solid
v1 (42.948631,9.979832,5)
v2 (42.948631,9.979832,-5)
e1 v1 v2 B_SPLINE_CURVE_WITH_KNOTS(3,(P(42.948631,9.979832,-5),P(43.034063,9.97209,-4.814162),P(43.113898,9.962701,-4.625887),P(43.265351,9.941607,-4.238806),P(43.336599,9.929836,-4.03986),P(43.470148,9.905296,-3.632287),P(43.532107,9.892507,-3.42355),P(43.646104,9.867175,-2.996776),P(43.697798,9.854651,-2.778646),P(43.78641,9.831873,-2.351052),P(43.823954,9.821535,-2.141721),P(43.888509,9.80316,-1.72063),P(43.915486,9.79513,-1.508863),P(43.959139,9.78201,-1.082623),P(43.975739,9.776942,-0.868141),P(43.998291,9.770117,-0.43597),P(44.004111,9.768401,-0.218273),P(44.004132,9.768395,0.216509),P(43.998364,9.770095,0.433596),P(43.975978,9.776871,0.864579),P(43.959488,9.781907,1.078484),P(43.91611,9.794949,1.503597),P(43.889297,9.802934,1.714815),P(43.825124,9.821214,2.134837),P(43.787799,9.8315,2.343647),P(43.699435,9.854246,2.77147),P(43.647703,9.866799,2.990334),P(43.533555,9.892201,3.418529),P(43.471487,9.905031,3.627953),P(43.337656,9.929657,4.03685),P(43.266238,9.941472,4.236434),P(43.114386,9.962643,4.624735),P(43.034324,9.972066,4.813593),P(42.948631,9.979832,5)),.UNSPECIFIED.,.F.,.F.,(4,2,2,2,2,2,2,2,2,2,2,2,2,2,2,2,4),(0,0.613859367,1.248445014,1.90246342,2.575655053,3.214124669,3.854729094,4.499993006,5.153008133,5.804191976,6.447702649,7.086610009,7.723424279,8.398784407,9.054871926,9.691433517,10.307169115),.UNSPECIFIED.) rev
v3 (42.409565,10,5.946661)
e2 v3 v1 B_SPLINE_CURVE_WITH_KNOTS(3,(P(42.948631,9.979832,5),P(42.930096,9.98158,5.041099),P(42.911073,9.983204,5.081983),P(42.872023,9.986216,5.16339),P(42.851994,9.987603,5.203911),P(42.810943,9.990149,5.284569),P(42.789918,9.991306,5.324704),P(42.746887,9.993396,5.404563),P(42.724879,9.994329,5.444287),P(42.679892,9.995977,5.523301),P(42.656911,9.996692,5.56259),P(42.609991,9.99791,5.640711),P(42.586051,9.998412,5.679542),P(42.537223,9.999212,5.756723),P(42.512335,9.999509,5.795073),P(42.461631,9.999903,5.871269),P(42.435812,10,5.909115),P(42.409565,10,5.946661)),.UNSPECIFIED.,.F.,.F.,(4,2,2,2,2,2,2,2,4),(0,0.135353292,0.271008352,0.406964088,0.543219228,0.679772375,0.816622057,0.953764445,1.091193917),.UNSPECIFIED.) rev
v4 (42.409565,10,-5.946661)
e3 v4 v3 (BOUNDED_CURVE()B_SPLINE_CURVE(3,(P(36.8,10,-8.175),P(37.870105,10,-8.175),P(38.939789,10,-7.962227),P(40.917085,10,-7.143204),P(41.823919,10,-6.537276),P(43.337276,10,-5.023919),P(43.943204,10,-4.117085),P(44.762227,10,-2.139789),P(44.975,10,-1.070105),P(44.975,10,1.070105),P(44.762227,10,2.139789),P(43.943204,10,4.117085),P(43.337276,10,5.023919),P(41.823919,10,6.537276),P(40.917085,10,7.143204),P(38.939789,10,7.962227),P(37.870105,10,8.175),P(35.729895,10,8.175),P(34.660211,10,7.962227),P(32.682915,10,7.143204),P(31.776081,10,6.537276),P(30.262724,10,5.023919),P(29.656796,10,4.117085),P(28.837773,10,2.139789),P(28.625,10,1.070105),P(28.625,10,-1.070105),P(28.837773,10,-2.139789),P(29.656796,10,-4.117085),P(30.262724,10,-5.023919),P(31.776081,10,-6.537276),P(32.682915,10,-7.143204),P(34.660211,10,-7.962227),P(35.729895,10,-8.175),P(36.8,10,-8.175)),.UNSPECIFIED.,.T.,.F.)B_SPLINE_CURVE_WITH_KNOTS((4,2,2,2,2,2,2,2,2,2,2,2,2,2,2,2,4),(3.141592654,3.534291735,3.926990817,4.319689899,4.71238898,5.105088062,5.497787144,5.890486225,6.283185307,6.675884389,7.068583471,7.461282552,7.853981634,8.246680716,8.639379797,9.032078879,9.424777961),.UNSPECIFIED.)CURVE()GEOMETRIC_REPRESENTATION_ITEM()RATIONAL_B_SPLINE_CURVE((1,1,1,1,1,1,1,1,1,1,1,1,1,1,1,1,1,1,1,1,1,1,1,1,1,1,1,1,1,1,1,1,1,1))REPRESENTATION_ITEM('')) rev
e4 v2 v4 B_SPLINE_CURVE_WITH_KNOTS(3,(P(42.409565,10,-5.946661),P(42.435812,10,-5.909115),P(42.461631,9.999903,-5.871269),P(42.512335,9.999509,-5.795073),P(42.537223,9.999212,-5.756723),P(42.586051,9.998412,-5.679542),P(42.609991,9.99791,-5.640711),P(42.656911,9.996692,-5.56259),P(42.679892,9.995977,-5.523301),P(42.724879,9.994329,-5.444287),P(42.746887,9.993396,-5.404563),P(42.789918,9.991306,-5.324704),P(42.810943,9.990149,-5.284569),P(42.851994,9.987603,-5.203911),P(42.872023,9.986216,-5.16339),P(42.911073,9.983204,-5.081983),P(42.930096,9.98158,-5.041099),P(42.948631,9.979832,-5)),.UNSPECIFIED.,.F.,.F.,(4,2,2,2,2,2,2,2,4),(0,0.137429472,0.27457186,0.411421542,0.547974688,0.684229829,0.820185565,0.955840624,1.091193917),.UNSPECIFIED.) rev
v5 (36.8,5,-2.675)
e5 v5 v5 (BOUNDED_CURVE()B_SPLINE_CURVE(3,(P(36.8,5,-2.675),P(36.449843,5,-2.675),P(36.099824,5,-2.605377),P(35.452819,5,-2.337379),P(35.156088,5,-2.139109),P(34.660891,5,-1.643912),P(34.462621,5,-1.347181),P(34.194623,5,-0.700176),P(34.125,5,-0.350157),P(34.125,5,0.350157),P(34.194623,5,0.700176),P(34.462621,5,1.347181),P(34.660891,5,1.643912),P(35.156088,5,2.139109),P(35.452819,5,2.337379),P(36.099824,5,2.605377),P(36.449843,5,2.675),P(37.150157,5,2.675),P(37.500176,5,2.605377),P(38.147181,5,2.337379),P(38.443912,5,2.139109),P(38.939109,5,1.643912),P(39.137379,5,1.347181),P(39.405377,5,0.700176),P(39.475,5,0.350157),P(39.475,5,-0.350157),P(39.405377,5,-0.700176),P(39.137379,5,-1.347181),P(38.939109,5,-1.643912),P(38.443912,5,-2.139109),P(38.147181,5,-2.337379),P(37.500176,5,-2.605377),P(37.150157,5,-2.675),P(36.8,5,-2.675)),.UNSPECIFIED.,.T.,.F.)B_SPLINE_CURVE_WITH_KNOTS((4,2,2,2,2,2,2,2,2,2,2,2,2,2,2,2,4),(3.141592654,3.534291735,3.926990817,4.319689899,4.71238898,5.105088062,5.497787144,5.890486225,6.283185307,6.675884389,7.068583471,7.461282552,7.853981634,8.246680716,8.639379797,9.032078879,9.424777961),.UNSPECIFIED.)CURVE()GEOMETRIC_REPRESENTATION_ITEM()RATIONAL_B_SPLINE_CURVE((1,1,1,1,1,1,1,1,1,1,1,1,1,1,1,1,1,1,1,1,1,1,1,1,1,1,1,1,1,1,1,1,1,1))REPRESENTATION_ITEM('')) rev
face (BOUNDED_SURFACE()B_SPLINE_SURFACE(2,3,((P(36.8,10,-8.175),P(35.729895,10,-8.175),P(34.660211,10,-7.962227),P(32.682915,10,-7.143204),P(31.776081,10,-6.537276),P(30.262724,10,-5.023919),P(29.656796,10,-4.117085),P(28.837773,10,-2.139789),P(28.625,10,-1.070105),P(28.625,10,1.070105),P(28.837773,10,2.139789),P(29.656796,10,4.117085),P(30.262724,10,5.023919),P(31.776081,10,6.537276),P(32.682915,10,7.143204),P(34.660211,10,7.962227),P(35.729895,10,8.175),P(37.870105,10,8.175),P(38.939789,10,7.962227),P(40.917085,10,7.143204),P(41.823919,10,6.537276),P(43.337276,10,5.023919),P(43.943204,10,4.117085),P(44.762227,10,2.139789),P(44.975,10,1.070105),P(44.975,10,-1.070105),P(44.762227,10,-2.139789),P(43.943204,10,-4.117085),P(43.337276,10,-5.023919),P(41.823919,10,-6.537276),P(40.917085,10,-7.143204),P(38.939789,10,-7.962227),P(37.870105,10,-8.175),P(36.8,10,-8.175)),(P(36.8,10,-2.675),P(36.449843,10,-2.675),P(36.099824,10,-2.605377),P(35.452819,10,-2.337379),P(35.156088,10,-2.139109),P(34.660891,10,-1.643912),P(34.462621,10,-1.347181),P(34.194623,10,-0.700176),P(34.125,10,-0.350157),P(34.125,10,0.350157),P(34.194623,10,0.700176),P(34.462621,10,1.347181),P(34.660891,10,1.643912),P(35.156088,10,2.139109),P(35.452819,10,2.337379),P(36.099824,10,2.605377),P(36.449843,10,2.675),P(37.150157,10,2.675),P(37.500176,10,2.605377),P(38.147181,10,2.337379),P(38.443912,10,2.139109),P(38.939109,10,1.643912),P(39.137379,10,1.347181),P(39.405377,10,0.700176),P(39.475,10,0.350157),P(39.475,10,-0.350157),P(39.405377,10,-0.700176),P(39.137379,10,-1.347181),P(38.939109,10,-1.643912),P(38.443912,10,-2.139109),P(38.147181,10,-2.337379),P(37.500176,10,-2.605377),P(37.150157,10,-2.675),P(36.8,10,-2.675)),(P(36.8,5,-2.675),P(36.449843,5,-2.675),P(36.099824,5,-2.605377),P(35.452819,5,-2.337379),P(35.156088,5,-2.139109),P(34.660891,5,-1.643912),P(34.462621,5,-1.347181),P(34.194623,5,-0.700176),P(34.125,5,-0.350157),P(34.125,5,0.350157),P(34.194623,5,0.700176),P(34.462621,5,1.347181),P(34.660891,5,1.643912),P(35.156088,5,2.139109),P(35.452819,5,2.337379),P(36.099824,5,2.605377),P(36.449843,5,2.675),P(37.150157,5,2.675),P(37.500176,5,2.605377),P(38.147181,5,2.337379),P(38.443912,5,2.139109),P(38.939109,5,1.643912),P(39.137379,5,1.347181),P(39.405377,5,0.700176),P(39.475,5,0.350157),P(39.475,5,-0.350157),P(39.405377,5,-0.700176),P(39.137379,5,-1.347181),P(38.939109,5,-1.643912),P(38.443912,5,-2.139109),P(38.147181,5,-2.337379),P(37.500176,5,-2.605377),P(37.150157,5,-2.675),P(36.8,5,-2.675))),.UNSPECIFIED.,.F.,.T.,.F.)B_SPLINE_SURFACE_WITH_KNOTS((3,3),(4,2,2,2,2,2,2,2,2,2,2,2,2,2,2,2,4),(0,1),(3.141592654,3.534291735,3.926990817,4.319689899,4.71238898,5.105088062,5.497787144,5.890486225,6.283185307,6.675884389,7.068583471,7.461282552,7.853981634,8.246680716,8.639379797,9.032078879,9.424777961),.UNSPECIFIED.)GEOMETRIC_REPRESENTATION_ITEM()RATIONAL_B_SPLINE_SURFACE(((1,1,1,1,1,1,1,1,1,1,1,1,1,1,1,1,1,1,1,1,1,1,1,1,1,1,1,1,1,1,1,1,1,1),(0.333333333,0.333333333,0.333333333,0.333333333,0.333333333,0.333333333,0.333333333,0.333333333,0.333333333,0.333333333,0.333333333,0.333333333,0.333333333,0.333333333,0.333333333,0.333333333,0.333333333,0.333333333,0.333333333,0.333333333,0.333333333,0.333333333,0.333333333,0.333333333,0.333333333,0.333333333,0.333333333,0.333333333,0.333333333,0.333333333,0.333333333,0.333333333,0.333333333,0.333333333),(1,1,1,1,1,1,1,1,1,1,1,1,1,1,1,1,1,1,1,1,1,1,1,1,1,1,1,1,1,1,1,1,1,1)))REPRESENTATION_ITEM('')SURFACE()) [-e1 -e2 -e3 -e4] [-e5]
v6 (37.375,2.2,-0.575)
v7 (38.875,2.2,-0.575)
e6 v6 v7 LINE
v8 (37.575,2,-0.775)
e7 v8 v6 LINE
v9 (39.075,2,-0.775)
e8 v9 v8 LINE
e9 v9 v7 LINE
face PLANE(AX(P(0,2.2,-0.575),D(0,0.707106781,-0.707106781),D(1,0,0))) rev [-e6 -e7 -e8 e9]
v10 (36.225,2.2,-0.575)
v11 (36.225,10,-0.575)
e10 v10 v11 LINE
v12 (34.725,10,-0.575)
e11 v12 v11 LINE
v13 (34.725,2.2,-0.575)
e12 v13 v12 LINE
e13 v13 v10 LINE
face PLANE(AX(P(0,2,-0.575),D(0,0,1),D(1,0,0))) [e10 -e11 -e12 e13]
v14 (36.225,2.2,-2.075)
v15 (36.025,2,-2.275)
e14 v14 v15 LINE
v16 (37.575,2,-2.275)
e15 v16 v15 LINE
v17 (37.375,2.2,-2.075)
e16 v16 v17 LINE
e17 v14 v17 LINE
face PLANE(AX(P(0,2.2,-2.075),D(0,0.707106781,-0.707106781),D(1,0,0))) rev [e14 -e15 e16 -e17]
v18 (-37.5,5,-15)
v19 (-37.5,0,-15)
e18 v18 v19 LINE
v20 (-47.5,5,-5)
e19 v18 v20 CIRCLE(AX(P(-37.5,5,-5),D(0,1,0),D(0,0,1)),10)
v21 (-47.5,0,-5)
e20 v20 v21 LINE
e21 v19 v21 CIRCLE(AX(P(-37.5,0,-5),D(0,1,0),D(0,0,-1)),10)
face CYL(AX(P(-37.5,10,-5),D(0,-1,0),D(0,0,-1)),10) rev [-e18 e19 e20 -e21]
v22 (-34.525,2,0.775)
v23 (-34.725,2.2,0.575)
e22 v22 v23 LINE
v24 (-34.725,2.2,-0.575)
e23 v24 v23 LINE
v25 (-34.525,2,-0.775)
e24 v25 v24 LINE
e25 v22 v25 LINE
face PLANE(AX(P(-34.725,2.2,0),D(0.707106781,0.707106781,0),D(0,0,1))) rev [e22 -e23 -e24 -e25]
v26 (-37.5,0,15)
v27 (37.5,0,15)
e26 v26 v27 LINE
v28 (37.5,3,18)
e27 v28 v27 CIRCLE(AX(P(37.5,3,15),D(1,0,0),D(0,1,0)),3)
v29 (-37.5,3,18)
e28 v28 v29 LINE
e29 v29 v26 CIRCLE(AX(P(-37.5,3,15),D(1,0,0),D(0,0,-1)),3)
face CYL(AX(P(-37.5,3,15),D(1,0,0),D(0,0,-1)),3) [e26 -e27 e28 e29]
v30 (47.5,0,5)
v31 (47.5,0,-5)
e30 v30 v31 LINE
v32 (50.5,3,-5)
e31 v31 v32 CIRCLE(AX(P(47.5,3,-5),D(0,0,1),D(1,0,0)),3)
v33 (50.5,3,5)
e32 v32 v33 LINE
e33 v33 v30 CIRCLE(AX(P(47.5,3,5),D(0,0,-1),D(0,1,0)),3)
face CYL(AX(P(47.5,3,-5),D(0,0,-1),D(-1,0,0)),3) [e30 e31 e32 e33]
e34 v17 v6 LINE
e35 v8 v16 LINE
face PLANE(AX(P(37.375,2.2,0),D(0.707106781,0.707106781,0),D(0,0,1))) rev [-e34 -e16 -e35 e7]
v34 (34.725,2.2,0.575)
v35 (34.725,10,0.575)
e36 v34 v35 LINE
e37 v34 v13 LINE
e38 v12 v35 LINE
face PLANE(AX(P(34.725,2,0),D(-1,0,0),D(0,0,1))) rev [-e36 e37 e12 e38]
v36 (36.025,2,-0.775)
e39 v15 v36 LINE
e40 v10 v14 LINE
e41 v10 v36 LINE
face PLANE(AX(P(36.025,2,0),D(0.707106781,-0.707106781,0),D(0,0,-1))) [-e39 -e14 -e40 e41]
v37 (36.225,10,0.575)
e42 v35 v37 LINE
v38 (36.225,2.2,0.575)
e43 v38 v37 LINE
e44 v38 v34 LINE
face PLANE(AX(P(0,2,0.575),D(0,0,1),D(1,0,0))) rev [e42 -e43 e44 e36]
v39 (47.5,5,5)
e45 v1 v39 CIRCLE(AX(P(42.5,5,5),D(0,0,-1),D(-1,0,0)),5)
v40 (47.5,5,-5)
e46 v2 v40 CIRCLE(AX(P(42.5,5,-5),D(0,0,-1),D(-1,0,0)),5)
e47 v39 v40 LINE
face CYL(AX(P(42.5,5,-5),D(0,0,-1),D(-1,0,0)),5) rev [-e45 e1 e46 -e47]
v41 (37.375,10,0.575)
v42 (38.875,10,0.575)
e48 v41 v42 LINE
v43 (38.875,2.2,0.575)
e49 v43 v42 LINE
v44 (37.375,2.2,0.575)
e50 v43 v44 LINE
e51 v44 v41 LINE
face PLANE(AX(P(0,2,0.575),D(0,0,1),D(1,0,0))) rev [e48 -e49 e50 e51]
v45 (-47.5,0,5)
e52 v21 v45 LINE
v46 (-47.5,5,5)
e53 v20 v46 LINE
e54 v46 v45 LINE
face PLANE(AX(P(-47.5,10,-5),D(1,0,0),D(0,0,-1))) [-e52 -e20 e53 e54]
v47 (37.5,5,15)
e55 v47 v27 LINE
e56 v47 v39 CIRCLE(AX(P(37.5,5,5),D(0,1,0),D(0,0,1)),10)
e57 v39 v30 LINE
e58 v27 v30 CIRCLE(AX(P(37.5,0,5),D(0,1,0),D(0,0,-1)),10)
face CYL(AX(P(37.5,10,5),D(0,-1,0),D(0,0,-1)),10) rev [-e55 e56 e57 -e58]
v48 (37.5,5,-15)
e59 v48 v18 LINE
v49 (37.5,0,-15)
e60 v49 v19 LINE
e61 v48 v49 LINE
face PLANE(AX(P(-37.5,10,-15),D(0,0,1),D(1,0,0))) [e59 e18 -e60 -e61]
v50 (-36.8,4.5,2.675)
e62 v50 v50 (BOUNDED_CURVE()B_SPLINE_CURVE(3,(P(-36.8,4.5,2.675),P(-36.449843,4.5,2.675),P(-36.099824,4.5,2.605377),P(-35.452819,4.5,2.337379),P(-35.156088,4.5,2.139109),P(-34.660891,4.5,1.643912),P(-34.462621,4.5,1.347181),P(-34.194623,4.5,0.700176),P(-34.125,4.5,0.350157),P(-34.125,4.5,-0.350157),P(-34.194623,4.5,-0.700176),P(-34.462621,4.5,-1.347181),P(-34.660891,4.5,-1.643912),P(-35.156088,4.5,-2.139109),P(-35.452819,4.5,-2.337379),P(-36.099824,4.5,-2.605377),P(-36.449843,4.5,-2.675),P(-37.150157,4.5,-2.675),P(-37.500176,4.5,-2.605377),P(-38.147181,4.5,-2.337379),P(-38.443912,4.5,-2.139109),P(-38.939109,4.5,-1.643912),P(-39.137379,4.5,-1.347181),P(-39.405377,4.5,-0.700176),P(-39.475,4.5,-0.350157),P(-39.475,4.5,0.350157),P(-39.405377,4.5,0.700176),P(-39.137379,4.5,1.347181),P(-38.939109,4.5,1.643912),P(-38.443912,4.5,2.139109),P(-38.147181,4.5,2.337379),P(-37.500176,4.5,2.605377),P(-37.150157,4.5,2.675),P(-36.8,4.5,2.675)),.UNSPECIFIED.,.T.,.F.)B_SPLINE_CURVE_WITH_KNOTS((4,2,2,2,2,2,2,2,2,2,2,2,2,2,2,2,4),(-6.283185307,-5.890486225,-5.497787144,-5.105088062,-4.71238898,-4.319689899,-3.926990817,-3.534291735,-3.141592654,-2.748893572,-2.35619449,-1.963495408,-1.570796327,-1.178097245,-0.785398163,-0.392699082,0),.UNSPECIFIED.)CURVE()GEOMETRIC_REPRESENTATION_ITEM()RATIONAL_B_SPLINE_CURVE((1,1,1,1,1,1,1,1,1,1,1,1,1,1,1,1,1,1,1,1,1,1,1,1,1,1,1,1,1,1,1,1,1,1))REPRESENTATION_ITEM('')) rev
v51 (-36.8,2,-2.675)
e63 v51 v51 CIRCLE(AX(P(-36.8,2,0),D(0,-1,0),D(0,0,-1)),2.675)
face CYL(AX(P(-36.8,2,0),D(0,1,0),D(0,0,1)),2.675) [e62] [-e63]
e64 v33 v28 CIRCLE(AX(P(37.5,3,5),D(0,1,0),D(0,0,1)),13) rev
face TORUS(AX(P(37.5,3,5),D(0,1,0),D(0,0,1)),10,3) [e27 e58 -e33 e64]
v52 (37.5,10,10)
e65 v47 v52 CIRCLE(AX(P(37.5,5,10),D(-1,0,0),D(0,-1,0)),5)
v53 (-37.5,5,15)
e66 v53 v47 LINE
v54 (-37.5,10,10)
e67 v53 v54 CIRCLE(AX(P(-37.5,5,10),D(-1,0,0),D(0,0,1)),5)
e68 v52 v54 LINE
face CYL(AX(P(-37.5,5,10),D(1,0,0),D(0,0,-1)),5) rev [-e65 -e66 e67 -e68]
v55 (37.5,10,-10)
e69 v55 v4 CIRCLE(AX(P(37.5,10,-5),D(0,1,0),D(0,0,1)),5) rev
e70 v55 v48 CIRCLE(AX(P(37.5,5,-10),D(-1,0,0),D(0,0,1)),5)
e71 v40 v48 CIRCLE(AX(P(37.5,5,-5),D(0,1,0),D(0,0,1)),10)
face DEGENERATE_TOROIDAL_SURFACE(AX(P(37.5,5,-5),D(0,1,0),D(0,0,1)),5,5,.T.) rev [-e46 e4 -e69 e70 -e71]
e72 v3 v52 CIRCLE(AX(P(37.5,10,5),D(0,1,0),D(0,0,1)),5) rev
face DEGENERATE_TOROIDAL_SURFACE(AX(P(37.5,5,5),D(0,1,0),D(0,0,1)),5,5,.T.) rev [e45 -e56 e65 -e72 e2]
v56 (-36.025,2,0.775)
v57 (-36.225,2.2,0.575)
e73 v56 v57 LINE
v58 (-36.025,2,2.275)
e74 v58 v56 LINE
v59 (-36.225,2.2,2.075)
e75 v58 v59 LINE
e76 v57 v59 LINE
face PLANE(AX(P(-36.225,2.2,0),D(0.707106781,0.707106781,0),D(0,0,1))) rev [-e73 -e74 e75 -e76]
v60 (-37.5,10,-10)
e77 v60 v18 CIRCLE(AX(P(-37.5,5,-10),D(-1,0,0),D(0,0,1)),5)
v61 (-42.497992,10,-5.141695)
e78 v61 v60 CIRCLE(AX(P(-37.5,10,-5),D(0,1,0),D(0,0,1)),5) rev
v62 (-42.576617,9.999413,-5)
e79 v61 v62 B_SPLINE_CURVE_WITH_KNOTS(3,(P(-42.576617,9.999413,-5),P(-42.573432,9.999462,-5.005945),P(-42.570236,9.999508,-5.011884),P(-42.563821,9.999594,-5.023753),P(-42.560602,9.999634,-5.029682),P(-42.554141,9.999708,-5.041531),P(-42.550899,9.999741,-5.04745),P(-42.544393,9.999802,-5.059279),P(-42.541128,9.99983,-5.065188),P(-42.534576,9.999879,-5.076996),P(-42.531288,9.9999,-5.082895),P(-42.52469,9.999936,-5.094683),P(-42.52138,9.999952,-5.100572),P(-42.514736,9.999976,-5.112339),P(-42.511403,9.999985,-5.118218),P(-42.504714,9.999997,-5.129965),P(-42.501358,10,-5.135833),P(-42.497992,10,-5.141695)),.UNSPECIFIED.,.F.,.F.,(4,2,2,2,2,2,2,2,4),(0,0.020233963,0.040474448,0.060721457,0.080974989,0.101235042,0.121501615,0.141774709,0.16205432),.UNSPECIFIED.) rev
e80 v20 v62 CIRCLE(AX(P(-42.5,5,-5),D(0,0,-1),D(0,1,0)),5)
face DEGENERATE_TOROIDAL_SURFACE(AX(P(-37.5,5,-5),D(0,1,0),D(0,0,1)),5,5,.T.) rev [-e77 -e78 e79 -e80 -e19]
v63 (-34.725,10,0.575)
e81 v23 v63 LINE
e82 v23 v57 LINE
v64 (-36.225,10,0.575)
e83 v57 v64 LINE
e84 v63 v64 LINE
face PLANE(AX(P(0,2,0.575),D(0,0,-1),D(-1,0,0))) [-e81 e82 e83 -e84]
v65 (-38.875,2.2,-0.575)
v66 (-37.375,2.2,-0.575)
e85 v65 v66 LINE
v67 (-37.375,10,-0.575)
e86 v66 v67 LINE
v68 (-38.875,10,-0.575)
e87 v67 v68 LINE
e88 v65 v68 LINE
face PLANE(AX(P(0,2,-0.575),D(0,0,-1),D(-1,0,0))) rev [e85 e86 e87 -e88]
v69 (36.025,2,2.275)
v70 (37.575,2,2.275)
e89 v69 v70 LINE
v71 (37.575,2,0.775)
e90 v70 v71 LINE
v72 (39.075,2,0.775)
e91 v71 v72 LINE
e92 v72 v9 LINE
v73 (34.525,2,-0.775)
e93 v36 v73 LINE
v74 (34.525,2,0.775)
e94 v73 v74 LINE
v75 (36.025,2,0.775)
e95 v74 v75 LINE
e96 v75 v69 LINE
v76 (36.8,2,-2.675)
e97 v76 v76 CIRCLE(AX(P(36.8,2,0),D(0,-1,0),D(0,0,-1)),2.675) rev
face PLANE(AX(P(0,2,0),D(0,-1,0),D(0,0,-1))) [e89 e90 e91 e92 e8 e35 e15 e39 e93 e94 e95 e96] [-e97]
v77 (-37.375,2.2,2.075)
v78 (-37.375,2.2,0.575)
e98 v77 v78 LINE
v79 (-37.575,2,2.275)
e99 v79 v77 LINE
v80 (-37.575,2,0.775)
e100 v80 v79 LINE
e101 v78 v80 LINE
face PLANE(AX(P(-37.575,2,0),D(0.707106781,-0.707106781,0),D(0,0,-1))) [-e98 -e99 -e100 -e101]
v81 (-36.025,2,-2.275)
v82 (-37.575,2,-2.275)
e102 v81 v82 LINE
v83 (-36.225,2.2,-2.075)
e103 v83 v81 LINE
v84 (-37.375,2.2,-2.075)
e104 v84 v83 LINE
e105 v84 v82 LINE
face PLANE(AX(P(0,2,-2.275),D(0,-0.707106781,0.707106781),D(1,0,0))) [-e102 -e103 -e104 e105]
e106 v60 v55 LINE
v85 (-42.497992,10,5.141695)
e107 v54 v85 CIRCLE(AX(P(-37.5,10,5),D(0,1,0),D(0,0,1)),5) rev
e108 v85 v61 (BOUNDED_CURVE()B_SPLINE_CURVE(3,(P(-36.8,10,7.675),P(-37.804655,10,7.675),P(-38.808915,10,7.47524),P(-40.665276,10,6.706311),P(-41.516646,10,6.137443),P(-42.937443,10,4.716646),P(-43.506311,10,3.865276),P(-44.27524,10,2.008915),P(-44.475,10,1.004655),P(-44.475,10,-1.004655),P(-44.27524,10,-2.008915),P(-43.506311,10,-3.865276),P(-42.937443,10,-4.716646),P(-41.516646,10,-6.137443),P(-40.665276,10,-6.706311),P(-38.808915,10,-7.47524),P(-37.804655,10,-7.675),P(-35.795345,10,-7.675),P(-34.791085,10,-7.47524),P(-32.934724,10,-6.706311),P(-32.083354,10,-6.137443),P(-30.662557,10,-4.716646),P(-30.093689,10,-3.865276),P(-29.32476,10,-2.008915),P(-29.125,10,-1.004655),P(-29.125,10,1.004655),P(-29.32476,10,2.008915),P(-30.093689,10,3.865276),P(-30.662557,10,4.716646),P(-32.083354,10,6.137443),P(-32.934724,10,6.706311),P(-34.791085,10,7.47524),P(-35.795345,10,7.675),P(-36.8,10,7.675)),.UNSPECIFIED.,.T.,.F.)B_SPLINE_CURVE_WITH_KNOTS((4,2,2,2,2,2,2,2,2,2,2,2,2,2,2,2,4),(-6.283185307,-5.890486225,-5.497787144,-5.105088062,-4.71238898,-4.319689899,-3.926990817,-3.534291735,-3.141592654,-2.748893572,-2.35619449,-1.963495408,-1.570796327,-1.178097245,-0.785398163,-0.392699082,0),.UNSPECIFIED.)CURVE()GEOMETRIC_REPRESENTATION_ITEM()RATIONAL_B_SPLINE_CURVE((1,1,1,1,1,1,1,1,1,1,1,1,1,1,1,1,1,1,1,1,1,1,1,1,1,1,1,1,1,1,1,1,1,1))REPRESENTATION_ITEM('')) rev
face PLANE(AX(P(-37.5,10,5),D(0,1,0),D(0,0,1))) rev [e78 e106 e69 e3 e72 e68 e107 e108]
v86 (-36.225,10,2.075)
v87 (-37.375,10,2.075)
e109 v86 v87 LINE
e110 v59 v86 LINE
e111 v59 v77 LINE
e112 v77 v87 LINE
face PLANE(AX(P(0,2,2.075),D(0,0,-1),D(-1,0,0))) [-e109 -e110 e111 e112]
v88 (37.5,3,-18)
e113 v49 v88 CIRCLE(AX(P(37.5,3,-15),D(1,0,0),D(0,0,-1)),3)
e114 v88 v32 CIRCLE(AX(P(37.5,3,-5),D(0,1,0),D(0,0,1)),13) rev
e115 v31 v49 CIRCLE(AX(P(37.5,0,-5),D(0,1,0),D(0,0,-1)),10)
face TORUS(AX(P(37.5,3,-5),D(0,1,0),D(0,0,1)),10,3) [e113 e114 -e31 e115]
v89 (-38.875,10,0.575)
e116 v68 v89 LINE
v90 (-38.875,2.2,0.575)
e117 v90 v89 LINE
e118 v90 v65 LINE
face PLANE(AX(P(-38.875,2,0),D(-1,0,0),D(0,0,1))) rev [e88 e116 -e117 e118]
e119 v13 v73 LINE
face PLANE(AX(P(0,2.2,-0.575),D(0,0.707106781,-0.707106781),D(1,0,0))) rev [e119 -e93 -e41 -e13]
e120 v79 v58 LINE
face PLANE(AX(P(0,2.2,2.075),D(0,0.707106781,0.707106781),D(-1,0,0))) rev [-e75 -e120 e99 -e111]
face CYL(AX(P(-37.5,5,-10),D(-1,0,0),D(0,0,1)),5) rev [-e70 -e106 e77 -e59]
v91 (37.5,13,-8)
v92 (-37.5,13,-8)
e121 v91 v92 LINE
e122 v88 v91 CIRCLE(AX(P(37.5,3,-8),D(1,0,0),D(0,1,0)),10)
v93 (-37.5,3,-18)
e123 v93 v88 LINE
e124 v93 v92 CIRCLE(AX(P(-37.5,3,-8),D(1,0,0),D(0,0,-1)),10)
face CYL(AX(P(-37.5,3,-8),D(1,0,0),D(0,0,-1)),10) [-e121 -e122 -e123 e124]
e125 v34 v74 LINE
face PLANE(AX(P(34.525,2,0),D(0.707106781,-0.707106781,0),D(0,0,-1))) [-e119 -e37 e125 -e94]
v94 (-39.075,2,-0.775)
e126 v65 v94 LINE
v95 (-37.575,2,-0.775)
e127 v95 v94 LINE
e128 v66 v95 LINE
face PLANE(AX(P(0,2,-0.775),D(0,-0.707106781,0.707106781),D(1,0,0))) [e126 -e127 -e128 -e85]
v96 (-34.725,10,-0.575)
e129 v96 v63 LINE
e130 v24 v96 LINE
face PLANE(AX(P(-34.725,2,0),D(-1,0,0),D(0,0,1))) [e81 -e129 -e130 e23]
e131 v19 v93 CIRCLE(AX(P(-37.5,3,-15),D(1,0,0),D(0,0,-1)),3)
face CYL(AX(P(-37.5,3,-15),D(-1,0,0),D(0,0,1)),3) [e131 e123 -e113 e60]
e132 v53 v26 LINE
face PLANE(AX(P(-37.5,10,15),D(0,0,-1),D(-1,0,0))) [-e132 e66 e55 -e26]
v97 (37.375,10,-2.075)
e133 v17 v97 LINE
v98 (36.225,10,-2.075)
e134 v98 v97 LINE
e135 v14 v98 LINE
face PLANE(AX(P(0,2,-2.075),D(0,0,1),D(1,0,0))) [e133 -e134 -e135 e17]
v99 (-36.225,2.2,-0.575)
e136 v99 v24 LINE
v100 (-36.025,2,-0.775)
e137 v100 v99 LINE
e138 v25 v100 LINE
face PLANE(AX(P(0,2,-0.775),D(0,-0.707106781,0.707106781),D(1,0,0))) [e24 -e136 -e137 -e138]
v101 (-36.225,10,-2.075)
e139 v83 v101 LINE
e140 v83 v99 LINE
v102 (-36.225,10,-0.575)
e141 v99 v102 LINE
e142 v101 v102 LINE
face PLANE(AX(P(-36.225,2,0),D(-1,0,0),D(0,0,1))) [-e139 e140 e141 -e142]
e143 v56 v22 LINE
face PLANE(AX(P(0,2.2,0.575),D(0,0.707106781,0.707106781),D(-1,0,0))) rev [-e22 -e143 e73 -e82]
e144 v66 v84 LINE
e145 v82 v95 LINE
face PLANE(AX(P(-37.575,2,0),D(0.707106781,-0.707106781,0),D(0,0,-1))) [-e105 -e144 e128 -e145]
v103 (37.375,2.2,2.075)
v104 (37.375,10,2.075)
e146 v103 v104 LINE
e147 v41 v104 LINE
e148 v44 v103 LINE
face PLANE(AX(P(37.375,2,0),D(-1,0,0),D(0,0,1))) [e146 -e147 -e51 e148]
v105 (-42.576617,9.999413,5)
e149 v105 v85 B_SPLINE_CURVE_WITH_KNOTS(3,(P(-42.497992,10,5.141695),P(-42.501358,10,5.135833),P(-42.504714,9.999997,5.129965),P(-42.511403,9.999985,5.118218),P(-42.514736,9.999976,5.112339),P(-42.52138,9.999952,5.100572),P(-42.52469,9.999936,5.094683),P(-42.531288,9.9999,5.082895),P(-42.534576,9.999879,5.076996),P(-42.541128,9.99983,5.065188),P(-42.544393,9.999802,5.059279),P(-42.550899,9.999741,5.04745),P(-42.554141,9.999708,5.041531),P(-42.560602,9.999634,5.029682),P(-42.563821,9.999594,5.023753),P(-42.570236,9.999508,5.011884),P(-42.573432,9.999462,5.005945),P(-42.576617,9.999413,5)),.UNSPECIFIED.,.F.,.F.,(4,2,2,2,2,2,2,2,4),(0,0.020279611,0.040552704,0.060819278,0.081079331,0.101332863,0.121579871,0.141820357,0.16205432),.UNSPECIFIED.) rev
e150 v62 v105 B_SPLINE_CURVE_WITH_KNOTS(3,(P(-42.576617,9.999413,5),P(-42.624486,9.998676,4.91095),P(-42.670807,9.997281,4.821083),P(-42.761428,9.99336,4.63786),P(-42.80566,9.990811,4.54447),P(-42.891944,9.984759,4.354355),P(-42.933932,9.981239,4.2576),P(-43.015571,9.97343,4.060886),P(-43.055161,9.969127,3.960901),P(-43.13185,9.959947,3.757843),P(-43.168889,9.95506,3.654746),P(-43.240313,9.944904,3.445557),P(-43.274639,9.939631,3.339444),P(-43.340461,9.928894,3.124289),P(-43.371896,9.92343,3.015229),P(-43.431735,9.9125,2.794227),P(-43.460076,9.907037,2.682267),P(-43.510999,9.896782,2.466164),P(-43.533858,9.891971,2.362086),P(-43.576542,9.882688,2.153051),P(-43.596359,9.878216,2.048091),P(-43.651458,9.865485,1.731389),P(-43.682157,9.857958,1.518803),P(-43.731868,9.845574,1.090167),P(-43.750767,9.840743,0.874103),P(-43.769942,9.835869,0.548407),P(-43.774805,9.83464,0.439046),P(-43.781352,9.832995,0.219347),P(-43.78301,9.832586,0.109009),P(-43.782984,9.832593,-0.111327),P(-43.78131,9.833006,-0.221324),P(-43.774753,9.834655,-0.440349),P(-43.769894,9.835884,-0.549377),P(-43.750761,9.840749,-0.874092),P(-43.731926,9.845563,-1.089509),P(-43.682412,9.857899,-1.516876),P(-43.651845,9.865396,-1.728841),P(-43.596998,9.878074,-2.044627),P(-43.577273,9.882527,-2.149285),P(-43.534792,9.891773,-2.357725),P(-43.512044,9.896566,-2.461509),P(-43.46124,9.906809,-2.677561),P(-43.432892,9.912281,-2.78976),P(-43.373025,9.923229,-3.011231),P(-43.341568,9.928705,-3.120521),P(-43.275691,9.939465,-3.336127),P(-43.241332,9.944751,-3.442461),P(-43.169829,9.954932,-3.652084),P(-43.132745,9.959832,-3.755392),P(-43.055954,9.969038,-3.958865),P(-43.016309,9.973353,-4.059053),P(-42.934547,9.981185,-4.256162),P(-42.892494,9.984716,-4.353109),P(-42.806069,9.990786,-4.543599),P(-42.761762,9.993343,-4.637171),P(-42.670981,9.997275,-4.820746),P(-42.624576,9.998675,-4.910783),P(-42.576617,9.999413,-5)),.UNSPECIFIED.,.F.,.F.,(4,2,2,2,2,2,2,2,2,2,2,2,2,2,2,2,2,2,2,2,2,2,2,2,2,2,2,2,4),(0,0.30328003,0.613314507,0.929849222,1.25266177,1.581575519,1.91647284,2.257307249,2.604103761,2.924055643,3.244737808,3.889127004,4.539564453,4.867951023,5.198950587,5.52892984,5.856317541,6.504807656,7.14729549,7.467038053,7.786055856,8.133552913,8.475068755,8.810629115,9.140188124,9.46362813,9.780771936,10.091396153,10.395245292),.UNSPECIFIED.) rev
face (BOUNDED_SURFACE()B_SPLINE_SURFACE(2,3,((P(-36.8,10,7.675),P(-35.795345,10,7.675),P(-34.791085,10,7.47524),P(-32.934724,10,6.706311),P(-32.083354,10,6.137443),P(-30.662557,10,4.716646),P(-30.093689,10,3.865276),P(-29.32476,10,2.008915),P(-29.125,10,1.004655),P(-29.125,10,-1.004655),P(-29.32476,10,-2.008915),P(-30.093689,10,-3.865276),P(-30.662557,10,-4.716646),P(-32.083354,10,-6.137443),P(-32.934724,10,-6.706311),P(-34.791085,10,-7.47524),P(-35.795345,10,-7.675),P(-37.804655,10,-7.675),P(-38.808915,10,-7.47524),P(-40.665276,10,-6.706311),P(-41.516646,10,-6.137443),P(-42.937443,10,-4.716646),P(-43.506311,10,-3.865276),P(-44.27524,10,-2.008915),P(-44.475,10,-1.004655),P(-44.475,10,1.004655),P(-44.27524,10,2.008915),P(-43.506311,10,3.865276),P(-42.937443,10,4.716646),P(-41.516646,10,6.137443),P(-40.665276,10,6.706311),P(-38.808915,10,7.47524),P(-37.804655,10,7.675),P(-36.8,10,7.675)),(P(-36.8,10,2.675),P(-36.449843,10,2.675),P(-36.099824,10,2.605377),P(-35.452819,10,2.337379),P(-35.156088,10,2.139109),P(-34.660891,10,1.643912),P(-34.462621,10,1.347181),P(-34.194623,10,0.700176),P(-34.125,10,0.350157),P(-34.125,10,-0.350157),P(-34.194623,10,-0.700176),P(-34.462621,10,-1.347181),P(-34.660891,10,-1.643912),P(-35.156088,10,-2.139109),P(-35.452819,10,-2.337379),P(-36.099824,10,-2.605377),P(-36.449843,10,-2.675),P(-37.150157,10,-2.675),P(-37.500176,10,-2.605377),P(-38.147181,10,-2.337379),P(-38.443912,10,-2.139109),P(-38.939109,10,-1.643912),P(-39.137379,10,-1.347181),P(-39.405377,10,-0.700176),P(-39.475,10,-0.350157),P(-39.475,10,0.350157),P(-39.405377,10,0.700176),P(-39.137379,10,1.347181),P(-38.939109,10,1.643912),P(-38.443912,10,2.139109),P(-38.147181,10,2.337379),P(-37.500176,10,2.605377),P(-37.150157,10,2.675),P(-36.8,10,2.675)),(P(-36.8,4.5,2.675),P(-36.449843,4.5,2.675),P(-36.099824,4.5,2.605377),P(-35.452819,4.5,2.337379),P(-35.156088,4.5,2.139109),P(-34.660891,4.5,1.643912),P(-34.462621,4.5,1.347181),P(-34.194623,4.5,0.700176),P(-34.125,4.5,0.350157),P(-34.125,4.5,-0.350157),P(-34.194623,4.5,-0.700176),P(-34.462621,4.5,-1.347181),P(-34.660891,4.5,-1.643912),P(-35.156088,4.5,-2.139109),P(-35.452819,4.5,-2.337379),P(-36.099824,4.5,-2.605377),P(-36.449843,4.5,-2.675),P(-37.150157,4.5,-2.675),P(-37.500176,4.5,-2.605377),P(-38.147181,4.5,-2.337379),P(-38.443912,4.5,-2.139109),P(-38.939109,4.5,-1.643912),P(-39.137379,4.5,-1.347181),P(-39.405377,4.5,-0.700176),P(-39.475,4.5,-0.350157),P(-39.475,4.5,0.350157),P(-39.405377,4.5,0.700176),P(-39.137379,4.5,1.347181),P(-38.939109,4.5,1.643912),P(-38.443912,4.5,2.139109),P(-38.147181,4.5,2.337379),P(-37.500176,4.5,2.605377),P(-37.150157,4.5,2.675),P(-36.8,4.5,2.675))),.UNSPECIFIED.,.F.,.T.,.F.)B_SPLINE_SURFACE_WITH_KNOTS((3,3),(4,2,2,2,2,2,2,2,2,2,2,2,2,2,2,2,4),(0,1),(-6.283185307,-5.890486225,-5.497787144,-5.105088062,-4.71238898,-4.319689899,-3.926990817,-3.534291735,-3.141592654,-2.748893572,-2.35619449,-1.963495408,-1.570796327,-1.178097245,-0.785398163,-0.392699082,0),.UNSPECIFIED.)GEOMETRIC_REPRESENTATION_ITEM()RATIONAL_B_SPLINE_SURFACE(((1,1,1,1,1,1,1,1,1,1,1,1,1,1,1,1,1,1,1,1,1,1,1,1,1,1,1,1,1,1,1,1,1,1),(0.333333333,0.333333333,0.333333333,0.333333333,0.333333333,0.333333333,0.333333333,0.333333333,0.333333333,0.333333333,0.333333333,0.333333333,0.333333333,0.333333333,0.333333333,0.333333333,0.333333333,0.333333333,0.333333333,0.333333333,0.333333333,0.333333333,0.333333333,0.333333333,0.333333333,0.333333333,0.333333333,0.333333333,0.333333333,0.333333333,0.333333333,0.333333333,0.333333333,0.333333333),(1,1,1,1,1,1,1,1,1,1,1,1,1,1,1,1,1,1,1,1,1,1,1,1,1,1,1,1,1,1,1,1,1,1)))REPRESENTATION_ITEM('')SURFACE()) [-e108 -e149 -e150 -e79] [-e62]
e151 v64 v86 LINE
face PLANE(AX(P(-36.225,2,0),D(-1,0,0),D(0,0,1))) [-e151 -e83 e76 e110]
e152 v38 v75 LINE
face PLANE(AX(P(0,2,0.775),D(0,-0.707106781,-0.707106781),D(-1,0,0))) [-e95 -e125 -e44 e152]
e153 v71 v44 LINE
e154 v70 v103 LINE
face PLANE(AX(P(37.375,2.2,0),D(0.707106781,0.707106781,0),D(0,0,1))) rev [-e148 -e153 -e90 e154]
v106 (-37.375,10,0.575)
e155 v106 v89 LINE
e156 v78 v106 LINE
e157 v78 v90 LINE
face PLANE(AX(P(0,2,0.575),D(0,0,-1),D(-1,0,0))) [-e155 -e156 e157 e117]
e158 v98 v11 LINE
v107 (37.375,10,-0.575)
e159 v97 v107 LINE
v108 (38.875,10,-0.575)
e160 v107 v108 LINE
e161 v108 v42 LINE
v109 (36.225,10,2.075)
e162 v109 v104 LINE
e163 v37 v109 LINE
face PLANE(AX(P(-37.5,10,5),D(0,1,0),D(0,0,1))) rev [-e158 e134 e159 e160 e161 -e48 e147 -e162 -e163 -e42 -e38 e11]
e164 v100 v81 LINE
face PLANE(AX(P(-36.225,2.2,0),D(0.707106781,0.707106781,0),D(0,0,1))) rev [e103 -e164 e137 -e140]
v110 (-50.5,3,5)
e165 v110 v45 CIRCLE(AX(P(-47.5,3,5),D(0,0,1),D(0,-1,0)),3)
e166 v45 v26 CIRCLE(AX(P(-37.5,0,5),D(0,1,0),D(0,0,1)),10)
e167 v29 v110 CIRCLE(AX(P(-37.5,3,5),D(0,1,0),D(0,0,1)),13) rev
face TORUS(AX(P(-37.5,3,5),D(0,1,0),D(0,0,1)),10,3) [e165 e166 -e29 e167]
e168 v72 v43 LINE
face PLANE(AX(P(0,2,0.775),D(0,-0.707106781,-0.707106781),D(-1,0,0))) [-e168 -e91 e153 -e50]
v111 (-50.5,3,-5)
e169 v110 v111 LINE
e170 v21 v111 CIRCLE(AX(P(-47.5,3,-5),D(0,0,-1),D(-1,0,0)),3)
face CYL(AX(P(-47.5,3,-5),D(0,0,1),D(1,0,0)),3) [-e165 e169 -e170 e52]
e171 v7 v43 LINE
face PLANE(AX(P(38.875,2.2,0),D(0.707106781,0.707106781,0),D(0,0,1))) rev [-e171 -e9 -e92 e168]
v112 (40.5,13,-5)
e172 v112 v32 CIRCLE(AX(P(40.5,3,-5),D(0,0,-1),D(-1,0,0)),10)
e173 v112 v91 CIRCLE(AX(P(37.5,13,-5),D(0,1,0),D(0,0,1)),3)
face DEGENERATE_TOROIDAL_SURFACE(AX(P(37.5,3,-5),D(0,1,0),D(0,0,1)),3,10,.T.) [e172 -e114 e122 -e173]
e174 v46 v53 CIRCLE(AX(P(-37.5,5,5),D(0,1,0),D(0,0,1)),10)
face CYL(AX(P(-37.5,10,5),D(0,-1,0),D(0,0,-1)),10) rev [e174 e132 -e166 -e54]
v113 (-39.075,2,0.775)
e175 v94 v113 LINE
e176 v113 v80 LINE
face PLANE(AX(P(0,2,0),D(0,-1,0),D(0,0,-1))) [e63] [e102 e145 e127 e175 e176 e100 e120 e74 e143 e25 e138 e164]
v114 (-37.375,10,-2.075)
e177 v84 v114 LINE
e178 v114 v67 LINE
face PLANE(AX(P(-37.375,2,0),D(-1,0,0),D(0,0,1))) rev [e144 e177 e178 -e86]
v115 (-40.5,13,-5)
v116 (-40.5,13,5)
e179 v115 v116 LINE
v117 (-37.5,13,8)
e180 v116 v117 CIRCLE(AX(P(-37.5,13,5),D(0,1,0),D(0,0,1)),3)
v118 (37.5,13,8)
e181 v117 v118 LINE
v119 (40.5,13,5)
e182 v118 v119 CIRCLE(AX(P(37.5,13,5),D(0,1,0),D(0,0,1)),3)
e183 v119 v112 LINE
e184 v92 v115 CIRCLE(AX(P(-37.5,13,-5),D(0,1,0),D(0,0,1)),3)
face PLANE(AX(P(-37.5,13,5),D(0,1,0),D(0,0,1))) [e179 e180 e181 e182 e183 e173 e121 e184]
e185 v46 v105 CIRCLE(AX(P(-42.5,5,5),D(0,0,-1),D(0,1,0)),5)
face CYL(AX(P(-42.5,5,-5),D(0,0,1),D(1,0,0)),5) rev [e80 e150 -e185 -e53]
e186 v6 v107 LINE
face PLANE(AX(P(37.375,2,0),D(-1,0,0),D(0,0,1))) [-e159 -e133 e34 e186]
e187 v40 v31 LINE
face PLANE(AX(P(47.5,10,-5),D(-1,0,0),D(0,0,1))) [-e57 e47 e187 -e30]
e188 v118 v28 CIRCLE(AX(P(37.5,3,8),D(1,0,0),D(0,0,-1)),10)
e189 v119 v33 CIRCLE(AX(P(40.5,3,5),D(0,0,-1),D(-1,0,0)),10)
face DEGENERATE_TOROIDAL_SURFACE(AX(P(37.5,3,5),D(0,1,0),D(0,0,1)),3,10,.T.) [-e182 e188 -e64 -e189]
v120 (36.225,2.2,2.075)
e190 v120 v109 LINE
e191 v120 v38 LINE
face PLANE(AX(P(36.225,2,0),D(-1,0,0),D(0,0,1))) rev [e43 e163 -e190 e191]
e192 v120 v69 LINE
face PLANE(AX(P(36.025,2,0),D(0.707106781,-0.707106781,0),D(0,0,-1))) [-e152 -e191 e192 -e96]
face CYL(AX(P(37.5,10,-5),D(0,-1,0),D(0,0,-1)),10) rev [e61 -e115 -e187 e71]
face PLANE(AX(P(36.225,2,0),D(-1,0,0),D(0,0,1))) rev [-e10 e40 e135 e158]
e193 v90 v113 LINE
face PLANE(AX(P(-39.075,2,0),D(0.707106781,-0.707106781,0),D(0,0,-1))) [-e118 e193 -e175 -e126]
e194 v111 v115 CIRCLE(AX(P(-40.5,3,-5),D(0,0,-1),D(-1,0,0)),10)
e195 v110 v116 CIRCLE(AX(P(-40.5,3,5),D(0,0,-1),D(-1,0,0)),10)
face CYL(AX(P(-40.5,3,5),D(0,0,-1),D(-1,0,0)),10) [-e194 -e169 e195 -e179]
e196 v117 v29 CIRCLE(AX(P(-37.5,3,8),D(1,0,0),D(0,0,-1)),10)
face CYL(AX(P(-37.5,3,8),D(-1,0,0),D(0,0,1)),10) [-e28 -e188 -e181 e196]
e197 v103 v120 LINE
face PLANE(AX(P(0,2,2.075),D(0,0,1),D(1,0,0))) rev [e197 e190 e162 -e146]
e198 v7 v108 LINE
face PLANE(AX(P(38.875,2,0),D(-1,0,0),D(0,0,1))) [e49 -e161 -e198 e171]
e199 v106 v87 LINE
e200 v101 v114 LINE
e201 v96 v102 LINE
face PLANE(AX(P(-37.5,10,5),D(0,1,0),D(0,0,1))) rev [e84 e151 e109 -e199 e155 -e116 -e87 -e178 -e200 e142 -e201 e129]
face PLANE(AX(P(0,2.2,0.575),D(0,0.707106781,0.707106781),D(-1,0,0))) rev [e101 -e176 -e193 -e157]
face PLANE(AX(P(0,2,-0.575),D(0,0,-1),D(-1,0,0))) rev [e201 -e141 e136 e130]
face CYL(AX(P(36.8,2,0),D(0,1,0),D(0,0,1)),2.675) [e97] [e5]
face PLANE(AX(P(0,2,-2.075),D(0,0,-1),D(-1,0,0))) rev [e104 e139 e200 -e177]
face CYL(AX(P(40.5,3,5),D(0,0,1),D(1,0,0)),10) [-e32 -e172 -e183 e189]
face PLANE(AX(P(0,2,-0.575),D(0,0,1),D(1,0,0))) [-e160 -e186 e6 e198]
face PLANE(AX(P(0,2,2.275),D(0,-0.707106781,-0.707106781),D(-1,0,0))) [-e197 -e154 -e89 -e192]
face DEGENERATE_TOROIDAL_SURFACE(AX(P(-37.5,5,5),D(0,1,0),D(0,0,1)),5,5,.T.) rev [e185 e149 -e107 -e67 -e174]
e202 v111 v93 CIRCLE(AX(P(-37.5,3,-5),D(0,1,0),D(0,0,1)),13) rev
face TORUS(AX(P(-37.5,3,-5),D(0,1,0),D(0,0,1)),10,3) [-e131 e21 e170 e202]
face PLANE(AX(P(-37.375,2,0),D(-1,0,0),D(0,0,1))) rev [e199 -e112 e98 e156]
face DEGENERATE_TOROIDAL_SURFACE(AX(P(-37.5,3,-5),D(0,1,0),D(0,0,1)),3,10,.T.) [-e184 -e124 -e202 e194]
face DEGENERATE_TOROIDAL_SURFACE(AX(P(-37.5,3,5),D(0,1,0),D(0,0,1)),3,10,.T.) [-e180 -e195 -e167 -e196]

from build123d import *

# Parameters (mm, degrees)
EXTRUDE_1_DEPTH = 10
SHELL_2_T       = 3
FILLET_3_R      = 10
FILLET_4_R      = 3
SKETCH_2_R      = 2.675
EXTRUDE_2_DEPTH = 8
FILLET_7_R      = 5
CHAMFER_1_SIZE  = 0.2
CHAMFER_2_SIZE  = 0.2
FILLET_9_SIZE   = 5.5
FILLET_9_SIZE_2 = 5


# Some blends are built 0.0001 mm under size
with BuildPart() as part:
    # 草图1 → 凸台-拉伸1 (new body)
    with BuildSketch(Plane(origin=(0, 0, 0), x_dir=(1, 0, 0), z_dir=(0, 1, 0))):
        with BuildLine():
            Line((-37.5, 15), (37.5, 15))
            ThreePointArc((37.5, 15), (44.571067812, 12.071067812), (47.5, 5))
            Line((47.5, 5), (47.5, -5))
            ThreePointArc((47.5, -5), (44.571067812, -12.071067812), (37.5, -15))
            Line((37.5, -15), (-37.5, -15))
            ThreePointArc((-37.5, -15), (-44.571067812, -12.071067812), (-47.5, -5))
            Line((-47.5, -5), (-47.5, 5))
            ThreePointArc((-47.5, 5), (-44.571067812, 12.071067812), (-37.5, 15))
        make_face()
    extrude(amount=EXTRUDE_1_DEPTH)

    # 抽壳2
    shell_2_openings = [part.faces().sort_by_distance(p)[0] for p in [
        (0, 0, 0),
    ]]
    offset(amount=SHELL_2_T, openings=shell_2_openings, kind=Kind.INTERSECTION)

    # 圆角3
    # the kernel refuses this fillet: 10 mm, written as the material it takes off along each edge
    with BuildSketch(Plane(origin=(37.5, 13, 5), x_dir=(1, 0, 0), z_dir=(0, 0, -1))) as fillet_3_piece_1:
        with BuildLine():
            CenterArc((13 - FILLET_3_R, FILLET_3_R), FILLET_3_R, 270, 90)
            Line((13 - FILLET_3_R, 0), (13, 0))
            Line((13, 0), (13, FILLET_3_R))
        make_face()
    revolve(axis=Axis((37.5, 13, 5), (0, -1, 0)), revolution_arc=90, mode=Mode.SUBTRACT)
    with BuildSketch(Plane(origin=(50.5, 13, 5), x_dir=(0, -1, 0), z_dir=(0, 0, -1)), Plane(origin=(-50.5, 13, -5), x_dir=(0, -1, 0), z_dir=(0, 0, 1))) as fillet_3_piece_2:
        with BuildLine():
            CenterArc((FILLET_3_R, FILLET_3_R), FILLET_3_R, 180, 90)
            Line((0, FILLET_3_R), (0, 0))
            Line((0, 0), (FILLET_3_R, 0))
        make_face()
    extrude(amount=10, mode=Mode.SUBTRACT)
    with BuildSketch(Plane(origin=(37.5, 13, -5), x_dir=(0, 0, -1), z_dir=(-1, 0, 0))) as fillet_3_piece_3:
        with BuildLine():
            CenterArc((13 - FILLET_3_R, FILLET_3_R), FILLET_3_R, 270, 90)
            Line((13 - FILLET_3_R, 0), (13, 0))
            Line((13, 0), (13, FILLET_3_R))
        make_face()
    revolve(axis=Axis((37.5, 13, -5), (0, -1, 0)), revolution_arc=90, mode=Mode.SUBTRACT)
    with BuildSketch(Plane(origin=(37.5, 13, -18), x_dir=(0, -1, 0), z_dir=(-1, 0, 0)), Plane(origin=(-37.5, 13, 18), x_dir=(0, -1, 0), z_dir=(1, 0, 0))) as fillet_3_piece_4:
        with BuildLine():
            CenterArc((FILLET_3_R, FILLET_3_R), FILLET_3_R, 180, 90)
            Line((0, FILLET_3_R), (0, 0))
            Line((0, 0), (FILLET_3_R, 0))
        make_face()
    extrude(amount=75, mode=Mode.SUBTRACT)
    with BuildSketch(Plane(origin=(-37.5, 13, -5), x_dir=(-1, 0, 0), z_dir=(0, 0, 1))) as fillet_3_piece_5:
        with BuildLine():
            CenterArc((13 - FILLET_3_R, FILLET_3_R), FILLET_3_R, 270, 90)
            Line((13 - FILLET_3_R, 0), (13, 0))
            Line((13, 0), (13, FILLET_3_R))
        make_face()
    revolve(axis=Axis((-37.5, 13, -5), (0, -1, 0)), revolution_arc=90, mode=Mode.SUBTRACT)
    with BuildSketch(Plane(origin=(-37.5, 13, 5), x_dir=(0, 0, 1), z_dir=(1, 0, 0))) as fillet_3_piece_6:
        with BuildLine():
            CenterArc((13 - FILLET_3_R, FILLET_3_R), FILLET_3_R, 270, 90)
            Line((13 - FILLET_3_R, 0), (13, 0))
            Line((13, 0), (13, FILLET_3_R))
        make_face()
    revolve(axis=Axis((-37.5, 13, 5), (0, -1, 0)), revolution_arc=90, mode=Mode.SUBTRACT)

    # 圆角4
    fillet_4_edges = [part.edges().sort_by_distance(p)[0] for p in [
        (50.5, 0, 0),
        (46.692388155, 0, 14.192388155),
        (0, 0, 18),
        (-46.692388155, 0, 14.192388155),
        (-50.5, 0, 0),
        (-46.692388155, 0, -14.192388155),
        (0, 0, -18),
        (46.692388155, 0, -14.192388155),
    ]]
    fillet(fillet_4_edges, radius=FILLET_4_R - 0.0001)  # a hair under: the kernel refuses the full size

    # 草图2 → 凸台-拉伸2 (add)
    # profile 1 of 2: a face of its own
    with BuildSketch(Plane(origin=(0, 10, 0), x_dir=(-1, 0, 0), z_dir=(0, -1, 0))):
        with Locations(Location((36.8, 0, 0), (0, 0, 270))):
            Circle(SKETCH_2_R)
        Polygon((34.725, -0.575), (34.725, 0.575), (36.225, 0.575), (36.225, 2.075), (37.375, 2.075), (37.375, 0.575), (38.875, 0.575), (38.875, -0.575), (37.375, -0.575), (37.375, -2.075), (36.225, -2.075), (36.225, -0.575), align=None, mode=Mode.SUBTRACT)
    # profile 2 of 2: a face of its own
    with BuildSketch(Plane(origin=(0, 10, 0), x_dir=(-1, 0, 0), z_dir=(0, -1, 0))):
        with Locations(Location((-36.8, 0, 0), (0, 0, 90))):
            Circle(SKETCH_2_R)
        Polygon((-37.375, 0.575), (-37.375, 2.075), (-36.225, 2.075), (-36.225, 0.575), (-34.725, 0.575), (-34.725, -0.575), (-36.225, -0.575), (-36.225, -2.075), (-37.375, -2.075), (-37.375, -0.575), (-38.875, -0.575), (-38.875, 0.575), align=None, mode=Mode.SUBTRACT)
    extrude(amount=EXTRUDE_2_DEPTH)

    # 圆角7
    fillet_7_edges = [part.edges().sort_by_distance(p)[0] for p in [
        (-44.571067812, 10, 12.071067812),
        (0, 10, 15),
        (44.571067812, 10, 12.071067812),
        (47.5, 10, 0),
        (44.571067812, 10, -12.071067812),
        (0, 10, -15),
        (-44.571067812, 10, -12.071067812),
        (-47.5, 10, 0),
    ]]
    fillet(fillet_7_edges, radius=FILLET_7_R)

    # 倒角1
    chamfer_1_edges = [part.edges().sort_by_distance(p)[0] for p in [
        (35.475, 2, -0.575),
        (37.375, 2, 1.325),
        (38.875, 2, 0),
        (38.125, 2, -0.575),
        (37.375, 2, -1.325),
        (36.8, 2, -2.075),
        (34.725, 2, 0),
        (35.475, 2, 0.575),
        (36.225, 2, 1.325),
        (36.8, 2, 2.075),
        (38.125, 2, 0.575),
        (36.225, 2, -1.325),
    ]]
    chamfer(chamfer_1_edges, length=CHAMFER_1_SIZE)

    # 倒角2
    chamfer_2_edges = [part.edges().sort_by_distance(p)[0] for p in [
        (-36.8, 2, -2.075),
        (-37.375, 2, -1.325),
        (-38.125, 2, -0.575),
        (-38.875, 2, 0),
        (-37.375, 2, 1.325),
        (-35.475, 2, -0.575),
        (-38.125, 2, 0.575),
        (-36.8, 2, 2.075),
        (-36.225, 2, 1.325),
        (-35.475, 2, 0.575),
        (-34.725, 2, 0),
        (-36.225, 2, -1.325),
    ]]
    chamfer(chamfer_2_edges, length=CHAMFER_2_SIZE)

    # 圆角9
    # a fillet whose section is not a circle: 5.5, 5 mm, written as the material it adds along each edge
    with BuildSketch(Plane(origin=(36.8, 10, 0), x_dir=(0, 0, -1), z_dir=(-1, 0, 0))) as fillet_9_piece_1:
        with BuildLine():
            Bezier((2.675 + FILLET_9_SIZE, 0), (2.675, 0), (2.675, FILLET_9_SIZE_2), weights=[1, 0.333333333, 1])
            Line((2.675, FILLET_9_SIZE_2), (2.675, 0))
            Line((2.675, 0), (2.675 + FILLET_9_SIZE, 0))
        make_face()
    revolve(axis=Axis((36.8, 10, 0), (0, -1, 0)))

    # 圆角10
    # a fillet whose section is not a circle: 5.5, 5 mm, written as the material it adds along each edge (its section moved 0.00015 mm through the faces so that the kernel can cut it)
    with BuildSketch(Plane(origin=(-36.8, 10, 0), x_dir=(0, 0, 1), z_dir=(1, 0, 0))) as fillet_10_piece_1:
        with BuildLine():
            Bezier((7.675, -0.00015), (2.67485, -0.00015), (2.67485, 5.5), weights=[1, 0.333333333, 1])
            Line((2.67485, 5.5), (2.56485, 5.5))
            ThreePointArc((2.56485, 5.5), (2.565, 2.75), (2.565, 0))
            Line((2.565, 0), (2.675, -0.11))
            ThreePointArc((2.675, -0.11), (5.175, -0.11), (7.675, -0.11015))
            Line((7.675, -0.11015), (7.675, -0.00015))
        make_face()
    revolve(axis=Axis((-36.8, 10, 0), (0, -1, 0)))


solid = part.part
